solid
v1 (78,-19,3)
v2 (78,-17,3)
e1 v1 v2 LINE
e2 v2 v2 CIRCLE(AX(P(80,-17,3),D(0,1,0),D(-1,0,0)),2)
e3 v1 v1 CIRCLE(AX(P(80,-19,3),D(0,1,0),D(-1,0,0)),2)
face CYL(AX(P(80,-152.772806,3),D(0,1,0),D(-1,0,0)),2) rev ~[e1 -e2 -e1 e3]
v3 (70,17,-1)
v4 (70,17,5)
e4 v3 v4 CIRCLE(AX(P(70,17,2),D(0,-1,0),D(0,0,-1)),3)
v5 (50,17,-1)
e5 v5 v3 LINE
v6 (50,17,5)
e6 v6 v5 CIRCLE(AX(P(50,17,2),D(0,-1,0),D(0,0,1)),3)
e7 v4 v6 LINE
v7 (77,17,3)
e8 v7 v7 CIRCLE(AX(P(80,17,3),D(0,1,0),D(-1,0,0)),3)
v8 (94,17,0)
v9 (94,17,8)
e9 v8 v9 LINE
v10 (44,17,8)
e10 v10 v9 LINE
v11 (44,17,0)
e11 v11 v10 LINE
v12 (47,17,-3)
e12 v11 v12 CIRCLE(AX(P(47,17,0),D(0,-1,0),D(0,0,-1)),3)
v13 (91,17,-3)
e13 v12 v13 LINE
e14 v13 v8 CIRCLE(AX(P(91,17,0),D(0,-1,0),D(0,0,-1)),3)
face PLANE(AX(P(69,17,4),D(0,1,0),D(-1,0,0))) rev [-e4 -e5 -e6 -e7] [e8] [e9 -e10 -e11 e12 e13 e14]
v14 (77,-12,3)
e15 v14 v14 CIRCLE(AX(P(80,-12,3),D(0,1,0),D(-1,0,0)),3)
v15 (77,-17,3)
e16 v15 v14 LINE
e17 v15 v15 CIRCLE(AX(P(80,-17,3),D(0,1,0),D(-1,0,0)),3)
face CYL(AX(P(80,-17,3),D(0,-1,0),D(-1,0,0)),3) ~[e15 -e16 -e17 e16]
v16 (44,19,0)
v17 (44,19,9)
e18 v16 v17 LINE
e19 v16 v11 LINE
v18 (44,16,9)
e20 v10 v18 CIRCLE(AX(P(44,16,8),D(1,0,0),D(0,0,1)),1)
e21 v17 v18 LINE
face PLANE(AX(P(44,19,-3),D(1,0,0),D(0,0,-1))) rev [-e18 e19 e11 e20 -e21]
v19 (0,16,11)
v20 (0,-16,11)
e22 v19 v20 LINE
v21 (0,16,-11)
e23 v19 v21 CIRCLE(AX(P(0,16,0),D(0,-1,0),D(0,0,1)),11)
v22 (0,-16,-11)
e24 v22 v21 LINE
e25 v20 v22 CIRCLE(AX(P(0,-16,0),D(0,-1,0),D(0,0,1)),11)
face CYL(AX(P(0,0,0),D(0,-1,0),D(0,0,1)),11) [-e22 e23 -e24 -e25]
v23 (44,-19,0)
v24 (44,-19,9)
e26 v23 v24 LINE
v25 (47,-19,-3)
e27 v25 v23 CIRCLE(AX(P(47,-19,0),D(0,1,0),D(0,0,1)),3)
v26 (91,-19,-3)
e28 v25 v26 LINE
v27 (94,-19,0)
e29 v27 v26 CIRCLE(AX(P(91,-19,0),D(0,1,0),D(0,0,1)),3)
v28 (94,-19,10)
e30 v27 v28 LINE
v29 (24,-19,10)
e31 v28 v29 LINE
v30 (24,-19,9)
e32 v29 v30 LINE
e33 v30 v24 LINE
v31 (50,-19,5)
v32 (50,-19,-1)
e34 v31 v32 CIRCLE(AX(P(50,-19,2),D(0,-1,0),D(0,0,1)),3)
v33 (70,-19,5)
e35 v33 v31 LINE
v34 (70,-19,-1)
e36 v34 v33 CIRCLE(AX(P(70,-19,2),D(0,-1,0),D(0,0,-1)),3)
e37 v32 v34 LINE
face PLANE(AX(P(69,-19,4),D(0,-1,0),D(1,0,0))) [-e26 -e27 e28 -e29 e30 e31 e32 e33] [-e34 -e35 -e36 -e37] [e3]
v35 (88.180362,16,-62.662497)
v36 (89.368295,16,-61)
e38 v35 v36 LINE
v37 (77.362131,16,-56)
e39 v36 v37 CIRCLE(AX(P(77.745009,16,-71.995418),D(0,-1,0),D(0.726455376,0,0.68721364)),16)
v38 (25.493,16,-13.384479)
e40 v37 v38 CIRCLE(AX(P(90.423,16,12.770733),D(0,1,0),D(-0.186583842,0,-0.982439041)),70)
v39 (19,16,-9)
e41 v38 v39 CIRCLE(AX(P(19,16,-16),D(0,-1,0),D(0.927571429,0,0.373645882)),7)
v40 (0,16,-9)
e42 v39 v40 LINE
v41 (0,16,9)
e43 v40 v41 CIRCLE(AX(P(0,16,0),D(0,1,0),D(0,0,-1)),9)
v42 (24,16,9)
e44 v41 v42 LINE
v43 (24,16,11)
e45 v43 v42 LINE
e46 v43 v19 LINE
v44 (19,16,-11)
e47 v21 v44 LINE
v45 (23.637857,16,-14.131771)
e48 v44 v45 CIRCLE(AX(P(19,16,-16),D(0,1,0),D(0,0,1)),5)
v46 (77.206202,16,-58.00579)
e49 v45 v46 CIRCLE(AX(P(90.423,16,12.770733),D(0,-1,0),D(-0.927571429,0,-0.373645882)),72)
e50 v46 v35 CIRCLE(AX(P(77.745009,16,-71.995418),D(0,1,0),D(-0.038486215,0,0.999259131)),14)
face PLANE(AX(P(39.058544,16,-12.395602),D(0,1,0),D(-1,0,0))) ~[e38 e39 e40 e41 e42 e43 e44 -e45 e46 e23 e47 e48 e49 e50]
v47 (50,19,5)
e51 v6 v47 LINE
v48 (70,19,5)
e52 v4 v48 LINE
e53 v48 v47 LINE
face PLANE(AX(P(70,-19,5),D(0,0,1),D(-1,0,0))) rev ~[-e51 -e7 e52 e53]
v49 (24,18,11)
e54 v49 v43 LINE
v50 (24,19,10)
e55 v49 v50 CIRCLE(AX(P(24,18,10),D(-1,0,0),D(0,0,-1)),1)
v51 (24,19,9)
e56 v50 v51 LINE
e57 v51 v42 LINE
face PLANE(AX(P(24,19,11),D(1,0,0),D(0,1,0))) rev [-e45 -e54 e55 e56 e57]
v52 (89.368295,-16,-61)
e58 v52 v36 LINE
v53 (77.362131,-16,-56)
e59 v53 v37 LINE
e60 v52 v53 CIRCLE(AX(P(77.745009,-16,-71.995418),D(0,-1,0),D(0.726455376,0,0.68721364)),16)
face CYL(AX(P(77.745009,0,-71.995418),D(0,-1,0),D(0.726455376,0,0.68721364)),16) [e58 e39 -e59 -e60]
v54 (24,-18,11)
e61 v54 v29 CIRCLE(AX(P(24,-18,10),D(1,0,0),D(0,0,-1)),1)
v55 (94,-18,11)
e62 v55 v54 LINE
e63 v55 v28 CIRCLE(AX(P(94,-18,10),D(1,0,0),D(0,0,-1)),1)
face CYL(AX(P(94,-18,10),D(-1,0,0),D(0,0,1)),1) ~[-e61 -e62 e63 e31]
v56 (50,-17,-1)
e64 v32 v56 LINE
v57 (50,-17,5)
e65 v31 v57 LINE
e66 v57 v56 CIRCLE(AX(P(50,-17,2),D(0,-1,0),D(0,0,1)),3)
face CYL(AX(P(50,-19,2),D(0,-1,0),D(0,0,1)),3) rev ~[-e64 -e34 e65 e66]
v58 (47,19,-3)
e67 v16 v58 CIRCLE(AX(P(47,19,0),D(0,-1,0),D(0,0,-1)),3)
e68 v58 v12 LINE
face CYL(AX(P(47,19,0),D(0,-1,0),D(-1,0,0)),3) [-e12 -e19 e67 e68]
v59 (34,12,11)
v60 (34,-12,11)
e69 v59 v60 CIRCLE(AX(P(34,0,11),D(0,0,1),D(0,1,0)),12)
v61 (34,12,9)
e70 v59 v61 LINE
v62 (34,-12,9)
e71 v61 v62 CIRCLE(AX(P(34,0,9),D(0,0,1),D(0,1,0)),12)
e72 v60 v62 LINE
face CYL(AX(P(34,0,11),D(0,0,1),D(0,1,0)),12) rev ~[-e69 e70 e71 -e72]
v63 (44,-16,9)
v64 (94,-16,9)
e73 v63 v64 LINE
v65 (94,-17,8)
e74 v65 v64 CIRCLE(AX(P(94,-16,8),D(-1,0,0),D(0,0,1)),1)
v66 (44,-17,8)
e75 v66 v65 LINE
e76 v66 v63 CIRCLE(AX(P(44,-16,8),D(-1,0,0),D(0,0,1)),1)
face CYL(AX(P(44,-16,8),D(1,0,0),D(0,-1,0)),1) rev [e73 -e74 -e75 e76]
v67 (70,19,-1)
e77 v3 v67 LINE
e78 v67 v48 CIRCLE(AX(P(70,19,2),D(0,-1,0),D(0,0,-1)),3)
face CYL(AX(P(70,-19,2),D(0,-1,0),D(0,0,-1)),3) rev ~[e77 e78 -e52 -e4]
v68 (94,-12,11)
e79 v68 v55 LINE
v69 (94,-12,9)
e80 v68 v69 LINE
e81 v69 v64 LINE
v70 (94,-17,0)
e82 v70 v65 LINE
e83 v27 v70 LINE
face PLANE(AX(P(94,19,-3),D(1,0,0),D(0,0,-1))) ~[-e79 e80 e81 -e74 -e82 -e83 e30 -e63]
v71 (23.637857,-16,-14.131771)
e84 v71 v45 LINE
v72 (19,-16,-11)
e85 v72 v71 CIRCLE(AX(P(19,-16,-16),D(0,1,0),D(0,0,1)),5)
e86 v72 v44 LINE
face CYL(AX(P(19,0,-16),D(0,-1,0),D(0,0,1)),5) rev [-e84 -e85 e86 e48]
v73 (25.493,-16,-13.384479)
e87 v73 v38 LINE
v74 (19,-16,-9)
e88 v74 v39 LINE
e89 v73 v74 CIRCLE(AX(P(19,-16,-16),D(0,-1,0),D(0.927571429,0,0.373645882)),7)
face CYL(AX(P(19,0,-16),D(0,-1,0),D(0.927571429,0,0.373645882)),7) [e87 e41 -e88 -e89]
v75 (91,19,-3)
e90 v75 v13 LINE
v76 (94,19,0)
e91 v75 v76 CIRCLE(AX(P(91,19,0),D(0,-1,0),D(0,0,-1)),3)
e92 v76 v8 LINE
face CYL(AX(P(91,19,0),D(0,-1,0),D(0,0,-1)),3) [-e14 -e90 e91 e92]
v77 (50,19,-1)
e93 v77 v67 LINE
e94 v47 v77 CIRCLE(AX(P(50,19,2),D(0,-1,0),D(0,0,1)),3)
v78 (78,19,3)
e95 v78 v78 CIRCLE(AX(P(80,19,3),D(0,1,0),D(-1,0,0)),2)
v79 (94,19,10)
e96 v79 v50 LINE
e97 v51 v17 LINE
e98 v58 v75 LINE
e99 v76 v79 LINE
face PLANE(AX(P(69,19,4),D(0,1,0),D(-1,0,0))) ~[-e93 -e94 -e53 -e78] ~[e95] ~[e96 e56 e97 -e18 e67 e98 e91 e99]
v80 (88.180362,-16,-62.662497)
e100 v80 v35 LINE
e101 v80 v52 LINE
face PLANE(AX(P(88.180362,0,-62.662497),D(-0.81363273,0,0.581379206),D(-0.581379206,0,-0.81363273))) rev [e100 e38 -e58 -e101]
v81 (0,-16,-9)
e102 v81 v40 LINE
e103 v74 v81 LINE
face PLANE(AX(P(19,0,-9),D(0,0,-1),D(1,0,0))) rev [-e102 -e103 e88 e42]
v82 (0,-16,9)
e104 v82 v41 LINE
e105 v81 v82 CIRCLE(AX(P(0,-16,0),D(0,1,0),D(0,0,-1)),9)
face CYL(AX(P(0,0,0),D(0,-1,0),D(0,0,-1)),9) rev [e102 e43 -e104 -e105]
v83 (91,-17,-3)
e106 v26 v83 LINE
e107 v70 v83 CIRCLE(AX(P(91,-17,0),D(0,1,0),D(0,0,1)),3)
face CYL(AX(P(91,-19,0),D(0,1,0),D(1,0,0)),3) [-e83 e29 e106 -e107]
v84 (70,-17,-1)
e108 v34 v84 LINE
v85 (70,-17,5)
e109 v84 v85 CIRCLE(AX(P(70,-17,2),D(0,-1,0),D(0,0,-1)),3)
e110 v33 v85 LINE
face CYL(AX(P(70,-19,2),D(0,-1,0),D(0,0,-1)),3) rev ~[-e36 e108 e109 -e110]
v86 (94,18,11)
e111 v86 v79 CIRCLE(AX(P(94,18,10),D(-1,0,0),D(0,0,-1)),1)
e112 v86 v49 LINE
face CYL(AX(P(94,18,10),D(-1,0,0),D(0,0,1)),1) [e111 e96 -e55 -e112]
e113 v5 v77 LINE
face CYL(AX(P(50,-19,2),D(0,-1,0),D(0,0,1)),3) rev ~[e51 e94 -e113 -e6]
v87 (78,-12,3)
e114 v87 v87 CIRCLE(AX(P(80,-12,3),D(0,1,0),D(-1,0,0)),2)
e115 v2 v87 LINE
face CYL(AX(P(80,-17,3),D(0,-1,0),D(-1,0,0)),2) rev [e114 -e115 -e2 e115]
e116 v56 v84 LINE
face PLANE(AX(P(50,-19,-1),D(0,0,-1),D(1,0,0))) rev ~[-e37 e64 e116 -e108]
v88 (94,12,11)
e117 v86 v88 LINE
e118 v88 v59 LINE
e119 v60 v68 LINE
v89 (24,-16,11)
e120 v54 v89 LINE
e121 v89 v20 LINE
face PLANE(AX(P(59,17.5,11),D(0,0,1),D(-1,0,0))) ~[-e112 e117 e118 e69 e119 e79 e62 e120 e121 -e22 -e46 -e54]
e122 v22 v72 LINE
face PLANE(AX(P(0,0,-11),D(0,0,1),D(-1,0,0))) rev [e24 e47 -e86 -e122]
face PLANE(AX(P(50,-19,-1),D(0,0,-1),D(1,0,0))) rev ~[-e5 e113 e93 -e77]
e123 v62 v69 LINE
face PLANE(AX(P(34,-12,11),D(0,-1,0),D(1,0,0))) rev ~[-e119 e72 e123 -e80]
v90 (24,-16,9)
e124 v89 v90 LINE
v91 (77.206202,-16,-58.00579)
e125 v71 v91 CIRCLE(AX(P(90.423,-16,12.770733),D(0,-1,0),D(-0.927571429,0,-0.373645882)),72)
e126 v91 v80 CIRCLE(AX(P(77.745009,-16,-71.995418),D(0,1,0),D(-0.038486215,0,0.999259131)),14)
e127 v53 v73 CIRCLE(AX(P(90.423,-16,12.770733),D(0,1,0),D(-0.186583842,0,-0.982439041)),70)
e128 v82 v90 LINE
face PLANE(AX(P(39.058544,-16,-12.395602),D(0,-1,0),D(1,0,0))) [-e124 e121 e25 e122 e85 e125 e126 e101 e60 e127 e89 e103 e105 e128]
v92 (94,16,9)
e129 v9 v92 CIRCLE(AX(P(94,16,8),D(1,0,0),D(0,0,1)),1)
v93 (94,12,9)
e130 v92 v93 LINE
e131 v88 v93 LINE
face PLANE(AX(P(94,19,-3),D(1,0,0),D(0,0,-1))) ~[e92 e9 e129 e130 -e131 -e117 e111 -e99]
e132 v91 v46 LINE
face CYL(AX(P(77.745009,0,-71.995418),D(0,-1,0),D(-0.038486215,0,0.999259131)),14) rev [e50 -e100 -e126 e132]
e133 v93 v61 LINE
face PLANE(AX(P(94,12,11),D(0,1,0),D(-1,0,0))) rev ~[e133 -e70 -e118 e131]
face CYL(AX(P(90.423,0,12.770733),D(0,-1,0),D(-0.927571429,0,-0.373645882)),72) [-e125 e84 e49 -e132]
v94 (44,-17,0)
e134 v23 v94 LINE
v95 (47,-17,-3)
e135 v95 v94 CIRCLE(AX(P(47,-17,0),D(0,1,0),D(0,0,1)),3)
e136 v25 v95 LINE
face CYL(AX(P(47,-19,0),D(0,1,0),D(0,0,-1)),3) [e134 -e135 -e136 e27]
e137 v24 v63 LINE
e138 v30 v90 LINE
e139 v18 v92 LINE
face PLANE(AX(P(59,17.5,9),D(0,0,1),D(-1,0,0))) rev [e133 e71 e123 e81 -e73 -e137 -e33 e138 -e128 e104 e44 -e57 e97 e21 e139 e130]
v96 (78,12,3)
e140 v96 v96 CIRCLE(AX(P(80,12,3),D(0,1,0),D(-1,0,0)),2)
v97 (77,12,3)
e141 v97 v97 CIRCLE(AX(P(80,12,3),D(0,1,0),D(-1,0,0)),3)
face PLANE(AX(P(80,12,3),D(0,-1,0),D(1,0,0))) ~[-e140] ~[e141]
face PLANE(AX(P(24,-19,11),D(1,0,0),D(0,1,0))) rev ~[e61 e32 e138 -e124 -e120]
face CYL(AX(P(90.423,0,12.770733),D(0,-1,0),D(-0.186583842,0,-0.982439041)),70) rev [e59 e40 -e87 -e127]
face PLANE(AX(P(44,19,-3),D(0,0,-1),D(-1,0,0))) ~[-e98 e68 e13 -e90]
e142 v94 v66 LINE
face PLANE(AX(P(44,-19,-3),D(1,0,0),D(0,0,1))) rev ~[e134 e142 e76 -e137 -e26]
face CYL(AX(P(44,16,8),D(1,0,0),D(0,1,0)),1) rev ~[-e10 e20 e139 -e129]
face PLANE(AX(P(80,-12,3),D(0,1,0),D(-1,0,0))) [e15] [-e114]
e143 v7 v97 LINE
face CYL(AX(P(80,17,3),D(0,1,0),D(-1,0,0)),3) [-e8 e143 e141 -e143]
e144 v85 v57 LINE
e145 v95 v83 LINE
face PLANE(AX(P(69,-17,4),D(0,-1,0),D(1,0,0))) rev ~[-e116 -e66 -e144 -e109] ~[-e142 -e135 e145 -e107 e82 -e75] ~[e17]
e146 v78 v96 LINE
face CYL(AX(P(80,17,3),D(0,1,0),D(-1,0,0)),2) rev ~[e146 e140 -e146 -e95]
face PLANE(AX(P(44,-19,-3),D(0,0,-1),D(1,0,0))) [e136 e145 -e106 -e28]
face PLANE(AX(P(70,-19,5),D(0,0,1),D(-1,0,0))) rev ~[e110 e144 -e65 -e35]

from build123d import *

# Parameters (mm, degrees)
F1_DEPTH  = 16
F2_W      = 70
F2_H      = 3
F3_DEPTH  = 2
F4_W      = 50
F4_H      = 14
F5_DEPTH  = 2
F6_R      = 1
F9_DEPTH  = 2
F11_DEPTH = 38.001
F13_D     = 4
F14_R     = 3
F14_R_2   = 2
F15_DEPTH = 5
F16_R     = 3


# Not quite as in the source:
# - a pattern or mirror of a feature is missing from the dataset's text; its kind, count and spacing are read off the source's solid


with BuildPart() as f1:
    # F0 (on Front) → F1 (new body)
    with BuildSketch(Plane.XZ):
        with BuildLine():
            Line((94, 11), (0, 11))
            ThreePointArc((0, 11), (-11, 0), (0, -11))
            Line((0, -11), (19, -11))
            ThreePointArc((19, -11), (21.7981112342, -11.8562609251), (23.6378571429, -14.1317705916))
            ThreePointArc((23.6378571429, -14.1317705916), (44.801622976, -42.9310620406), (77.2062019292, -58.0057903986))
            ThreePointArc((77.2062019292, -58.0057903986), (83.2137047902, -59.1076967266), (88.1803617021, -62.6624973259))
            Line((88.1803617021, -62.6624973259), (89.3682949555, -61))
            ThreePointArc((89.3682949555, -61), (83.8961627896, -57.2250659611), (77.3621310458, -56))
            ThreePointArc((77.3621310458, -56), (45.985801942, -41.3156371935), (25.493, -13.3844788282))
            ThreePointArc((25.493, -13.3844788282), (22.9173557279, -10.1987652951), (19, -9))
            Line((19, -9), (0, -9))
            ThreePointArc((0, -9), (-9, 0), (0, 9))
            Line((0, 9), (94, 9))
            Line((94, 9), (94, 11))
        make_face()
    extrude(amount=F1_DEPTH)

    # F2 (on face) → F3 (join)
    with BuildSketch(Plane.XY.offset(11)):
        with Locations((59, -17.5)):
            Rectangle(F2_W, F2_H)
    extrude(amount=-F3_DEPTH)

    # F4 (on face) → F5 (join)
    with BuildSketch(Plane.XZ.offset(19)):
        with Locations((69, 4)):
            Rectangle(F4_W, F4_H)
    extrude(amount=-F5_DEPTH)

    # F6
    f6_edges = [f1.edges().sort_by_distance(p)[0] for p in [
        (59, -19, 11),
        (69, -17, 9),
    ]]
    fillet(f6_edges, radius=F6_R)

    # F7: F1 across plane


with BuildPart() as f1_1:
    add(f1.part)
    add(f1.part.mirror(Plane.XZ))

    # F8 (on face) → F9 (cut)
    with BuildSketch(Plane.XY.offset(11)):
        with BuildLine():
            Line((94, 12), (34, 12))
            ThreePointArc((34, 12), (22, 0), (34, -12))
            Line((34, -12), (94, -12))
            Line((94, -12), (94, 12))
        make_face()
    extrude(amount=-F9_DEPTH, mode=Mode.SUBTRACT)

    # F10 (on face) → F11 (cut, through all)
    with BuildSketch(Plane.XZ.offset(19)):
        with BuildLine():
            ThreePointArc((50, 5), (47, 2), (50, -1))
            Line((50, -1), (70, -1))
            ThreePointArc((70, -1), (73, 2), (70, 5))
            Line((70, 5), (50, 5))
        make_face()
    extrude(amount=-F11_DEPTH, mode=Mode.SUBTRACT)

    # F13 (through all)
    with Locations(Plane.XZ.offset(19)):
        with Locations((80, 3)):
            Hole(F13_D / 2)

    # F14 (on face) → F15 (join)
    with BuildSketch(Plane(origin=(0, -17, 0), x_dir=(-1, 0, 0), z_dir=(0, 1, 0))):
        with Locations((-80, 3)):
            Circle(F14_R)
        with Locations((-80, 3)):
            Circle(F14_R_2, mode=Mode.SUBTRACT)
    f15 = extrude(amount=F15_DEPTH)

    # F15_copies: F15 across plane
    add(f15.mirror(Plane.ZX))

    # F16
    f16_edges = [f1_1.edges().sort_by_distance(p)[0] for p in [
        (44, -18, -3),
        (44, 18, -3),
        (94, -18, -3),
        (94, 18, -3),
    ]]
    fillet(f16_edges, radius=F16_R)


solid = f1_1.part
